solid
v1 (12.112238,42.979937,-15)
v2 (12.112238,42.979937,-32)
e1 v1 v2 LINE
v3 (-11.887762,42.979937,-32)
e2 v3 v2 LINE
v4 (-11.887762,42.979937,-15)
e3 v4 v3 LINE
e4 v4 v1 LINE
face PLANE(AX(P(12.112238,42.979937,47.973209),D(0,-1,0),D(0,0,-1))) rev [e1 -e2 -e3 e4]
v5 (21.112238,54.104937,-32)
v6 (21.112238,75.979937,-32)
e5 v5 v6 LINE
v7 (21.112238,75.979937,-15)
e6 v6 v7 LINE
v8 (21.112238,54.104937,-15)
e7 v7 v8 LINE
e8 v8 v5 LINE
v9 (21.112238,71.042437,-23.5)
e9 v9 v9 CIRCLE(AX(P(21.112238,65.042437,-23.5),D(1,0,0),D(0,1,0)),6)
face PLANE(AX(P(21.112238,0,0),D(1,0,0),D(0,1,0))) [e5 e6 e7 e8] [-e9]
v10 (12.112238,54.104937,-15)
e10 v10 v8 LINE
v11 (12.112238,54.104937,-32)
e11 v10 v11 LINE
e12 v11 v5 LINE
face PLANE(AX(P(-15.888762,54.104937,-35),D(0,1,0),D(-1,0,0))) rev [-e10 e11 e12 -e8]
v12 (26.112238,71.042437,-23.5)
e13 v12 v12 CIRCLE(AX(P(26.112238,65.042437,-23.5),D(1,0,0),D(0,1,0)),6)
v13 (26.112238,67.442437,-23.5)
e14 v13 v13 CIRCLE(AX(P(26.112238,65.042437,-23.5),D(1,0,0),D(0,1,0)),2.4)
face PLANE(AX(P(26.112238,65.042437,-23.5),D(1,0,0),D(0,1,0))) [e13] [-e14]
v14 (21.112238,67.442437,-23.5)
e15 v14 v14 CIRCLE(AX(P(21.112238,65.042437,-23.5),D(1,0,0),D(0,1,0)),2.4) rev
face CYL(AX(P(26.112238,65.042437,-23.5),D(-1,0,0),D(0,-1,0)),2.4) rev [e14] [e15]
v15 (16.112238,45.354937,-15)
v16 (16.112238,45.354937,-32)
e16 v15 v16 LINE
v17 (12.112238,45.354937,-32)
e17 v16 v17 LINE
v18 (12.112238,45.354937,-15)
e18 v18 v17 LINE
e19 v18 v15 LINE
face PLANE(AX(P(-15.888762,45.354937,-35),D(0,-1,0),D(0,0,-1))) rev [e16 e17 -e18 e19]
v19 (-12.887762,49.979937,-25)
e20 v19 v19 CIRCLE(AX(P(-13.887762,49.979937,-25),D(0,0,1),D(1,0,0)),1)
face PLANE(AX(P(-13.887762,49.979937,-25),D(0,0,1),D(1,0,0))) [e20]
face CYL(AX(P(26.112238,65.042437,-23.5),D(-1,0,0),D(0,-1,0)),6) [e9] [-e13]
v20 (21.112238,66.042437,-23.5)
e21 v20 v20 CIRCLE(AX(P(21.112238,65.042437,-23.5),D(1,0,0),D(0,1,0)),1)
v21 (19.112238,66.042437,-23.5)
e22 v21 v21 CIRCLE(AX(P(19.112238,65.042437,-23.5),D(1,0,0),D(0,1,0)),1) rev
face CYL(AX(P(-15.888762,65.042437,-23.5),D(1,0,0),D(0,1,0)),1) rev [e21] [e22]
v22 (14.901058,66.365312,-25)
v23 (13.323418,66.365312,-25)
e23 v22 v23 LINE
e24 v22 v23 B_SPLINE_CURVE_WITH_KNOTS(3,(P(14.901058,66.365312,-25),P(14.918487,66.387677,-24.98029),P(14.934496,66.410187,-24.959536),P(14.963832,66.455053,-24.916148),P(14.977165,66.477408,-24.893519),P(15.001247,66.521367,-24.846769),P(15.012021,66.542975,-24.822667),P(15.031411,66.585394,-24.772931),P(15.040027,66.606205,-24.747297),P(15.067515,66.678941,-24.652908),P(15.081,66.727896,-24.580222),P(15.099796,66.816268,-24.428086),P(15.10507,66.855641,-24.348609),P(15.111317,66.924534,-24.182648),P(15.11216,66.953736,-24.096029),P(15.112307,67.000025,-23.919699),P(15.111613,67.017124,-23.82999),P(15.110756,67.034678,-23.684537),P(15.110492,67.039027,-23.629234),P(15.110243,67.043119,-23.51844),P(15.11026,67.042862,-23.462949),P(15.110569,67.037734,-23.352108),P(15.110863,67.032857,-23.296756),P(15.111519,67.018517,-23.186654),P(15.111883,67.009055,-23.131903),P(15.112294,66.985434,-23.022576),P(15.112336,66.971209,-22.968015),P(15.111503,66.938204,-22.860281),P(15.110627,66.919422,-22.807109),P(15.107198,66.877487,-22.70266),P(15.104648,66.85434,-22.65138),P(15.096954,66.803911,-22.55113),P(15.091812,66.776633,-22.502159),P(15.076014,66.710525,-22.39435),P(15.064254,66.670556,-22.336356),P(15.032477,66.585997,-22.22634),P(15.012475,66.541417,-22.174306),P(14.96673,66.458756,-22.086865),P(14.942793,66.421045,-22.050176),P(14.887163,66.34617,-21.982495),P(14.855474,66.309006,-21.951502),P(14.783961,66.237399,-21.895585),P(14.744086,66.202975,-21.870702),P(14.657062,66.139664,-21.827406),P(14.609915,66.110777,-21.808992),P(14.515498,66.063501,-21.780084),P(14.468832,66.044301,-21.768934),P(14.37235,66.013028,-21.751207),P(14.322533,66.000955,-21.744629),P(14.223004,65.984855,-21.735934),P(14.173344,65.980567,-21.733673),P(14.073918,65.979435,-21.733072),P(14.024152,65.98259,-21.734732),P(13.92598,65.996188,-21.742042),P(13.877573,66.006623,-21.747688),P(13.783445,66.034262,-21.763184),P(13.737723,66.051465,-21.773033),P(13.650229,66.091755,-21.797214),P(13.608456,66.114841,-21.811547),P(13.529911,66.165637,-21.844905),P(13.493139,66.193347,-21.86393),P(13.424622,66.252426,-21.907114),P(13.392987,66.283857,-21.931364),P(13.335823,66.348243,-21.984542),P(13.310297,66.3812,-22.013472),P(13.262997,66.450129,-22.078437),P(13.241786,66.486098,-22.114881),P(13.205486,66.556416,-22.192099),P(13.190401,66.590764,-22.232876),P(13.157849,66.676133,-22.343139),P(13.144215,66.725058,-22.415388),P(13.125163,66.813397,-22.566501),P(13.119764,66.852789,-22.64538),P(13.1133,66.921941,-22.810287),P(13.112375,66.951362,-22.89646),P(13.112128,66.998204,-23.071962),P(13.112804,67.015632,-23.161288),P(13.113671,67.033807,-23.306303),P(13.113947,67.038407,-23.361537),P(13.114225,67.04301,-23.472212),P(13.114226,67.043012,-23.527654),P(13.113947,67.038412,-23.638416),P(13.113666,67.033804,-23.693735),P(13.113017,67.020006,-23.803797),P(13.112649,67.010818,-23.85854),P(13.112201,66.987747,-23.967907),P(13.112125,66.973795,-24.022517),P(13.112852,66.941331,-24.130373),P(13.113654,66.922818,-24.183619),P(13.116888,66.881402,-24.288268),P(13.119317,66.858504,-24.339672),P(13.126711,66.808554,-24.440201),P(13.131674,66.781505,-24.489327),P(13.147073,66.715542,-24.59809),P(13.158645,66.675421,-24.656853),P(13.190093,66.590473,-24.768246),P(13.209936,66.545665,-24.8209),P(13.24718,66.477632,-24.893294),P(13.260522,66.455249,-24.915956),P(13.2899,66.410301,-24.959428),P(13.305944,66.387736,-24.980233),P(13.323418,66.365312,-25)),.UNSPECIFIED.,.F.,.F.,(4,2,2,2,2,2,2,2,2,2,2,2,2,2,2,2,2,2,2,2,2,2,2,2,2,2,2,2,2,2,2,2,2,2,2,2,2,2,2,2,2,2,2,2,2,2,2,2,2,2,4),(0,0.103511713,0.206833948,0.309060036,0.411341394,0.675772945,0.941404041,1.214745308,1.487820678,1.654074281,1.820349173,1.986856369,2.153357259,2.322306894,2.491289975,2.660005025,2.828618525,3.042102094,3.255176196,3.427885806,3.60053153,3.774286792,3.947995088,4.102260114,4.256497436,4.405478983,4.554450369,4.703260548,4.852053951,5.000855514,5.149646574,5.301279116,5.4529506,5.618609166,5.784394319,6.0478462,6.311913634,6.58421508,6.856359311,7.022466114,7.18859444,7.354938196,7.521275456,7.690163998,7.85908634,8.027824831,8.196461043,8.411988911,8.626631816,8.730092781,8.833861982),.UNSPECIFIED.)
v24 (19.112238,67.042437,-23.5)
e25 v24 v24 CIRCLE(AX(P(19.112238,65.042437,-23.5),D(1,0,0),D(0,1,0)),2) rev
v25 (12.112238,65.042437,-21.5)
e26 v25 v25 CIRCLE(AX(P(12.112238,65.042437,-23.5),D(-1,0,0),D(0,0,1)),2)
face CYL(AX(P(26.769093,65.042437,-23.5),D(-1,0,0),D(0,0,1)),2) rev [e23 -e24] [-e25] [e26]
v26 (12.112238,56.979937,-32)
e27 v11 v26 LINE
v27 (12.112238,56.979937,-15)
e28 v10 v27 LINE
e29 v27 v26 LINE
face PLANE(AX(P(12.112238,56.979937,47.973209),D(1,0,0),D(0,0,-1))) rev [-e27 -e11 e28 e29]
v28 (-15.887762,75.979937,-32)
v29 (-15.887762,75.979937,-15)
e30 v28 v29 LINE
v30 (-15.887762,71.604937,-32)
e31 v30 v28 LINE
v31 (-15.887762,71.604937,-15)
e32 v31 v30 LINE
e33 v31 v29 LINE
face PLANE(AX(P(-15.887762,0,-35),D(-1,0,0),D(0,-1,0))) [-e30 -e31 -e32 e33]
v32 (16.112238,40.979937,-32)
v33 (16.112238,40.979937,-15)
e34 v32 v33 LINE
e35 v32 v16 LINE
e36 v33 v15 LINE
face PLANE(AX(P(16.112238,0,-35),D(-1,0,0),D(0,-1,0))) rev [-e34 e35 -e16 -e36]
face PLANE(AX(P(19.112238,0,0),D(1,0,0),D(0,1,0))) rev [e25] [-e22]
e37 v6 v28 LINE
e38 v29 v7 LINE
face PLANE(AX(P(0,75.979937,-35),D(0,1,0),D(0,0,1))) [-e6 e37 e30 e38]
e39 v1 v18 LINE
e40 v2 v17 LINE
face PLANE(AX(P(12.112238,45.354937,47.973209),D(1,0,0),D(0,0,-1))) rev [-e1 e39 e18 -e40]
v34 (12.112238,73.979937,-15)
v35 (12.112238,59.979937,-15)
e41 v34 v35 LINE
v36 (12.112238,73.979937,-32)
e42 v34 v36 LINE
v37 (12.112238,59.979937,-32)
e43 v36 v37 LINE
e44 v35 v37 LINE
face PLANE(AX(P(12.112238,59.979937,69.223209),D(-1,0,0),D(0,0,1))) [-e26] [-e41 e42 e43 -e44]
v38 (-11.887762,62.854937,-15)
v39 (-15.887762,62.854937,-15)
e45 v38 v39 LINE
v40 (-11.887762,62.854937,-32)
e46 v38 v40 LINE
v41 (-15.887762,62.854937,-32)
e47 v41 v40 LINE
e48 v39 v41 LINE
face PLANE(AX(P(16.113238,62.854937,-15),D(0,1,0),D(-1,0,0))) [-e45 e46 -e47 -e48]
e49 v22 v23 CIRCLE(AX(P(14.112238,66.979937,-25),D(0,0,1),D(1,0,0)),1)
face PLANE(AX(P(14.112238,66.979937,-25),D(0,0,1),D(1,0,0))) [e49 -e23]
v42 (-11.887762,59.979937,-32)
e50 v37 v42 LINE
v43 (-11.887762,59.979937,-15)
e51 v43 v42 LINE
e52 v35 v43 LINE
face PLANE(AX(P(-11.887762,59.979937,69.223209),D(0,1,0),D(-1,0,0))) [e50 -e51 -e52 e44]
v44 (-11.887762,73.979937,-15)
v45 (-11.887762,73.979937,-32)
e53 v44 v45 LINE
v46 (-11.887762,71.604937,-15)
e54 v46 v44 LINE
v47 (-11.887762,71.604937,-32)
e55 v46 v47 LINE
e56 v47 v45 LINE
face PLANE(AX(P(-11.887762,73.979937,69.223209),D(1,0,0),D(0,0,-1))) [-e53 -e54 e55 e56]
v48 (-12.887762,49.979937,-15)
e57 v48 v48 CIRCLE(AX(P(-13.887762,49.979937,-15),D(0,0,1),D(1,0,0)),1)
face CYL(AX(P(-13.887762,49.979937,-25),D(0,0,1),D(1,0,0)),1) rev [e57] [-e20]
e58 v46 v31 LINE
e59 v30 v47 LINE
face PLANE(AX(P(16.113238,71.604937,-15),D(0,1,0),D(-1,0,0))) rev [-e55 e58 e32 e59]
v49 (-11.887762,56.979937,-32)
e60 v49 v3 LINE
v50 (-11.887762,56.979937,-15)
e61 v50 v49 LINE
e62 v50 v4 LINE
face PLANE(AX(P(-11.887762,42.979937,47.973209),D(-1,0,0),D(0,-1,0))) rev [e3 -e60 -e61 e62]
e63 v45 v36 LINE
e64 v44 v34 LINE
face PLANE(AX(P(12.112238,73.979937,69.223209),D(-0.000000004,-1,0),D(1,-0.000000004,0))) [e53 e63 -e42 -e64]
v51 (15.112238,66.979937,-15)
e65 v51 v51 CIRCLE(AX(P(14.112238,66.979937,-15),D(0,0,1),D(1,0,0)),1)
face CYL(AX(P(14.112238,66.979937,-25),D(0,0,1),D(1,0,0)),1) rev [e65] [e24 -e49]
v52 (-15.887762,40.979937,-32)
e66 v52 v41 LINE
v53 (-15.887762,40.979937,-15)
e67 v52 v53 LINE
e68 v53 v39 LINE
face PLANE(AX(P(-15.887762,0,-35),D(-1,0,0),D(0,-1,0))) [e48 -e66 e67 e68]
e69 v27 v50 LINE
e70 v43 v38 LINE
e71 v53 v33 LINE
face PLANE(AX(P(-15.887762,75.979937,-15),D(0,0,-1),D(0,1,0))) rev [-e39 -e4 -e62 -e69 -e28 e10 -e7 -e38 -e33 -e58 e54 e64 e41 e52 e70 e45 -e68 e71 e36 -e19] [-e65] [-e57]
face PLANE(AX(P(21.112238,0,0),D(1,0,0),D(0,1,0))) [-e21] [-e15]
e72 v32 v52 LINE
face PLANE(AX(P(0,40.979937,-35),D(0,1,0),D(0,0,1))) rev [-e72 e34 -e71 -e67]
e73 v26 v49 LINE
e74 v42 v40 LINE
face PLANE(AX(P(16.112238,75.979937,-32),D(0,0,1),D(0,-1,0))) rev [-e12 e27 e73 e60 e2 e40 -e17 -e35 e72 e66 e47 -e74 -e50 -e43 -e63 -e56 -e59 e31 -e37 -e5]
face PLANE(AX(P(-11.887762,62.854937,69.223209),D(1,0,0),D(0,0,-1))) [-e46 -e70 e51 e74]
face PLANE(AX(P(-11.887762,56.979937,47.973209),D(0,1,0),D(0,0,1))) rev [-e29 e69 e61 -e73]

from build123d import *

# Parameters (mm, degrees)
SKETCH2_W               = 32.000000477
SKETCH2_H               = 35
SKETCH2_W_2             = 22
SKETCH2_H_2             = 5
BOSS_EXTRUDE1_DEPTH     = 35
SKETCH3_W               = 15
SKETCH3_H               = 35
CUT_EXTRUDE1_DEPTH      = 90.56534365
CUT_EXTRUDE2_REACH      = 91.565
SKETCH4_W               = 20
SKETCH4_H               = 8.75
CUT_EXTRUDE3_REACH      = 91.565
SKETCH5_W               = 20
SKETCH5_H               = 8.75
SKETCH6_W               = 3
SKETCH6_H               = 35
CUT_EXTRUDE4_DEPTH      = 90.56534365
SKETCH11_R              = 1
CUT_EXTRUDE5_DEPTH      = 10
CUT_EXTRUDE6_DEPTH      = 80.508206961
CUT_EXTRUDE6_DEPTH_BACK = 17
CUT_EXTRUDE9_START      = -17
CUT_EXTRUDE9_DEPTH      = 17
SKETCH7_W               = 17
SKETCH7_H               = 21.875
BOSS_EXTRUDE2_DEPTH     = 5
SKETCH14_R              = 6
SKETCH14_R_2            = 2.4
BOSS_EXTRUDE6_DEPTH     = 5
CUT_EXTRUDE10_REACH     = 92.366
SKETCH15_R              = 1
SKETCH16_R              = 2
CUT_EXTRUDE11_DEPTH     = 7.000000238


# Read off the part's stored shape, not the designer's step: Cut-Extrude9
with BuildPart() as part:
    # Sketch2 → Boss-Extrude1 (new body)
    # profile 1 of 2: a face of its own
    with BuildSketch(Plane.XY):
        with Locations((0.112238017, 58.479936513)):
            Rectangle(SKETCH2_W, SKETCH2_H)
        Polygon((-10.887761984, 72.979936603), (-10.887761984, 43.979936513), (11.112238016, 43.979936513), (11.112238016, 72.979936513), align=None, mode=Mode.SUBTRACT)
    # profile 2 of 2: a face of its own
    with BuildSketch(Plane.XY):
        with Locations((0.112238016, 58.479936513)):
            Rectangle(SKETCH2_W_2, SKETCH2_H_2)
    extrude(amount=-BOSS_EXTRUDE1_DEPTH)

    # Sketch3 → Cut-Extrude1 (cut, through all)
    with BuildSketch(Plane(origin=(16.112238255, 0, 0), x_dir=(0, 0, -1), z_dir=(1, 0, 0))):
        with Locations((7.5, 58.479936513)):
            Rectangle(SKETCH3_W, SKETCH3_H)
    extrude(amount=-CUT_EXTRUDE1_DEPTH, mode=Mode.SUBTRACT)

    # Sketch4 → Cut-Extrude2 (cut, up to next)
    with BuildSketch(Plane.ZY.offset(15.887762222), mode=Mode.PRIVATE) as cut_extrude2_sk1:
        with Locations((-25, 67.229936513)):
            Rectangle(SKETCH4_W, SKETCH4_H)
    cut_extrude2_tool1 = extrude(cut_extrude2_sk1.sketch, amount=-CUT_EXTRUDE2_REACH, mode=Mode.PRIVATE) & part.part
    add(cut_extrude2_tool1.solids().sort_by_distance((-15.887762, 67.229937, -25))[0], mode=Mode.SUBTRACT)

    # Sketch5 → Cut-Extrude3 (cut, up to next)
    with BuildSketch(Plane(origin=(16.112238255, 0, 0), x_dir=(0, 0, -1), z_dir=(1, 0, 0)), mode=Mode.PRIVATE) as cut_extrude3_sk1:
        with Locations((25, 49.729936513)):
            Rectangle(SKETCH5_W, SKETCH5_H)
    cut_extrude3_tool1 = extrude(cut_extrude3_sk1.sketch, amount=-CUT_EXTRUDE3_REACH, mode=Mode.PRIVATE) & part.part
    add(cut_extrude3_tool1.solids().sort_by_distance((16.112238, 49.729937, -25))[0], mode=Mode.SUBTRACT)

    # Sketch6 → Cut-Extrude4 (cut, through all)
    with BuildSketch(Plane.ZY.offset(15.887762222)):
        with Locations((-33.5, 58.479936513)):
            Rectangle(SKETCH6_W, SKETCH6_H)
    extrude(amount=-CUT_EXTRUDE4_DEPTH, mode=Mode.SUBTRACT)

    # Sketch11 → Cut-Extrude5 (cut)
    with BuildSketch(Plane.XY.offset(-15)):
        with Locations((14.112238016, 66.979936513)):
            Circle(SKETCH11_R)
        with Locations((-13.887761984, 49.979936513)):
            Circle(SKETCH11_R)
    extrude(amount=-CUT_EXTRUDE5_DEPTH, mode=Mode.SUBTRACT)

    # Sketch12 → Cut-Extrude6 (cut, two sides: drawn at the far end of the back side and taken through both)
    with BuildSketch(Plane.XY.offset(-15).offset(-CUT_EXTRUDE6_DEPTH_BACK)):
        Polygon((-10.887761984, 62.854936513), (-11.887761984, 62.854936513), (-11.887761984, 59.979936513), (12.112238016, 59.979936513), (12.112238016, 73.979936509), (-11.887761984, 73.979936607), (-11.887761984, 71.604936513), (-10.887761984, 71.604936513), (-10.887761984, 72.979936603), (11.112238016, 72.979936513), (11.112238016, 60.979936513), (-10.887761984, 60.979936513), align=None)
    extrude(amount=CUT_EXTRUDE6_DEPTH + CUT_EXTRUDE6_DEPTH_BACK, mode=Mode.SUBTRACT)

    # Cut-Extrude9 outline → Cut-Extrude9 (cut)
    with BuildSketch(Plane.XY.offset(-15).offset(CUT_EXTRUDE9_START)):
        Polygon((12.112238016, 56.979936513), (-11.887761984, 56.979936513), (-11.887761984, 42.979936513), (12.112238016, 42.979936513), (12.112238016, 45.354936513), (11.112238016, 45.354936513), (11.112238016, 43.979936513), (-10.887761984, 43.979936513), (-10.887761984, 55.979936513), (11.112238016, 55.979936513), (11.112238016, 54.104936513), (12.112238016, 54.104936513), align=None)
    extrude(amount=CUT_EXTRUDE9_DEPTH, mode=Mode.SUBTRACT)

    # Sketch7 → Boss-Extrude2 (add)
    with BuildSketch(Plane(origin=(16.112238255, 0, 0), x_dir=(0, 0, -1), z_dir=(1, 0, 0))):
        with Locations((23.5, 65.042436513)):
            Rectangle(SKETCH7_W, SKETCH7_H)
    extrude(amount=BOSS_EXTRUDE2_DEPTH)

    # Sketch14 → Boss-Extrude6 (add)
    with BuildSketch(Plane(origin=(21.112238255, 0, 0), x_dir=(0, 0, -1), z_dir=(1, 0, 0))):
        with Locations(Location((23.5, 65.042436513, 0), (0, 0, 90))):
            Circle(SKETCH14_R)
        with Locations(Location((23.5, 65.042436513, 0), (0, 0, 90))):
            Circle(SKETCH14_R_2, mode=Mode.SUBTRACT)
    extrude(amount=BOSS_EXTRUDE6_DEPTH)

    # Sketch15 → Cut-Extrude10 (cut, up to next)
    with BuildSketch(Plane(origin=(21.112238255, 0, 0), x_dir=(0, 0, -1), z_dir=(1, 0, 0)), mode=Mode.PRIVATE) as cut_extrude10_sk1:
        with Locations(Location((23.5, 65.042436513, 0), (0, 0, 90))):
            Circle(SKETCH15_R)
    cut_extrude10_tool1 = extrude(cut_extrude10_sk1.sketch, amount=-CUT_EXTRUDE10_REACH, mode=Mode.PRIVATE) & part.part
    add(cut_extrude10_tool1.solids().sort_by_distance((21.112238, 65.042437, -23.5))[0], mode=Mode.SUBTRACT)

    # Sketch16 → Cut-Extrude11 (cut)
    with BuildSketch(Plane.ZY.offset(-12.112238016)):
        with Locations((-23.5, 65.042436513)):
            Circle(SKETCH16_R)
    extrude(amount=-CUT_EXTRUDE11_DEPTH, mode=Mode.SUBTRACT)


solid = part.part
